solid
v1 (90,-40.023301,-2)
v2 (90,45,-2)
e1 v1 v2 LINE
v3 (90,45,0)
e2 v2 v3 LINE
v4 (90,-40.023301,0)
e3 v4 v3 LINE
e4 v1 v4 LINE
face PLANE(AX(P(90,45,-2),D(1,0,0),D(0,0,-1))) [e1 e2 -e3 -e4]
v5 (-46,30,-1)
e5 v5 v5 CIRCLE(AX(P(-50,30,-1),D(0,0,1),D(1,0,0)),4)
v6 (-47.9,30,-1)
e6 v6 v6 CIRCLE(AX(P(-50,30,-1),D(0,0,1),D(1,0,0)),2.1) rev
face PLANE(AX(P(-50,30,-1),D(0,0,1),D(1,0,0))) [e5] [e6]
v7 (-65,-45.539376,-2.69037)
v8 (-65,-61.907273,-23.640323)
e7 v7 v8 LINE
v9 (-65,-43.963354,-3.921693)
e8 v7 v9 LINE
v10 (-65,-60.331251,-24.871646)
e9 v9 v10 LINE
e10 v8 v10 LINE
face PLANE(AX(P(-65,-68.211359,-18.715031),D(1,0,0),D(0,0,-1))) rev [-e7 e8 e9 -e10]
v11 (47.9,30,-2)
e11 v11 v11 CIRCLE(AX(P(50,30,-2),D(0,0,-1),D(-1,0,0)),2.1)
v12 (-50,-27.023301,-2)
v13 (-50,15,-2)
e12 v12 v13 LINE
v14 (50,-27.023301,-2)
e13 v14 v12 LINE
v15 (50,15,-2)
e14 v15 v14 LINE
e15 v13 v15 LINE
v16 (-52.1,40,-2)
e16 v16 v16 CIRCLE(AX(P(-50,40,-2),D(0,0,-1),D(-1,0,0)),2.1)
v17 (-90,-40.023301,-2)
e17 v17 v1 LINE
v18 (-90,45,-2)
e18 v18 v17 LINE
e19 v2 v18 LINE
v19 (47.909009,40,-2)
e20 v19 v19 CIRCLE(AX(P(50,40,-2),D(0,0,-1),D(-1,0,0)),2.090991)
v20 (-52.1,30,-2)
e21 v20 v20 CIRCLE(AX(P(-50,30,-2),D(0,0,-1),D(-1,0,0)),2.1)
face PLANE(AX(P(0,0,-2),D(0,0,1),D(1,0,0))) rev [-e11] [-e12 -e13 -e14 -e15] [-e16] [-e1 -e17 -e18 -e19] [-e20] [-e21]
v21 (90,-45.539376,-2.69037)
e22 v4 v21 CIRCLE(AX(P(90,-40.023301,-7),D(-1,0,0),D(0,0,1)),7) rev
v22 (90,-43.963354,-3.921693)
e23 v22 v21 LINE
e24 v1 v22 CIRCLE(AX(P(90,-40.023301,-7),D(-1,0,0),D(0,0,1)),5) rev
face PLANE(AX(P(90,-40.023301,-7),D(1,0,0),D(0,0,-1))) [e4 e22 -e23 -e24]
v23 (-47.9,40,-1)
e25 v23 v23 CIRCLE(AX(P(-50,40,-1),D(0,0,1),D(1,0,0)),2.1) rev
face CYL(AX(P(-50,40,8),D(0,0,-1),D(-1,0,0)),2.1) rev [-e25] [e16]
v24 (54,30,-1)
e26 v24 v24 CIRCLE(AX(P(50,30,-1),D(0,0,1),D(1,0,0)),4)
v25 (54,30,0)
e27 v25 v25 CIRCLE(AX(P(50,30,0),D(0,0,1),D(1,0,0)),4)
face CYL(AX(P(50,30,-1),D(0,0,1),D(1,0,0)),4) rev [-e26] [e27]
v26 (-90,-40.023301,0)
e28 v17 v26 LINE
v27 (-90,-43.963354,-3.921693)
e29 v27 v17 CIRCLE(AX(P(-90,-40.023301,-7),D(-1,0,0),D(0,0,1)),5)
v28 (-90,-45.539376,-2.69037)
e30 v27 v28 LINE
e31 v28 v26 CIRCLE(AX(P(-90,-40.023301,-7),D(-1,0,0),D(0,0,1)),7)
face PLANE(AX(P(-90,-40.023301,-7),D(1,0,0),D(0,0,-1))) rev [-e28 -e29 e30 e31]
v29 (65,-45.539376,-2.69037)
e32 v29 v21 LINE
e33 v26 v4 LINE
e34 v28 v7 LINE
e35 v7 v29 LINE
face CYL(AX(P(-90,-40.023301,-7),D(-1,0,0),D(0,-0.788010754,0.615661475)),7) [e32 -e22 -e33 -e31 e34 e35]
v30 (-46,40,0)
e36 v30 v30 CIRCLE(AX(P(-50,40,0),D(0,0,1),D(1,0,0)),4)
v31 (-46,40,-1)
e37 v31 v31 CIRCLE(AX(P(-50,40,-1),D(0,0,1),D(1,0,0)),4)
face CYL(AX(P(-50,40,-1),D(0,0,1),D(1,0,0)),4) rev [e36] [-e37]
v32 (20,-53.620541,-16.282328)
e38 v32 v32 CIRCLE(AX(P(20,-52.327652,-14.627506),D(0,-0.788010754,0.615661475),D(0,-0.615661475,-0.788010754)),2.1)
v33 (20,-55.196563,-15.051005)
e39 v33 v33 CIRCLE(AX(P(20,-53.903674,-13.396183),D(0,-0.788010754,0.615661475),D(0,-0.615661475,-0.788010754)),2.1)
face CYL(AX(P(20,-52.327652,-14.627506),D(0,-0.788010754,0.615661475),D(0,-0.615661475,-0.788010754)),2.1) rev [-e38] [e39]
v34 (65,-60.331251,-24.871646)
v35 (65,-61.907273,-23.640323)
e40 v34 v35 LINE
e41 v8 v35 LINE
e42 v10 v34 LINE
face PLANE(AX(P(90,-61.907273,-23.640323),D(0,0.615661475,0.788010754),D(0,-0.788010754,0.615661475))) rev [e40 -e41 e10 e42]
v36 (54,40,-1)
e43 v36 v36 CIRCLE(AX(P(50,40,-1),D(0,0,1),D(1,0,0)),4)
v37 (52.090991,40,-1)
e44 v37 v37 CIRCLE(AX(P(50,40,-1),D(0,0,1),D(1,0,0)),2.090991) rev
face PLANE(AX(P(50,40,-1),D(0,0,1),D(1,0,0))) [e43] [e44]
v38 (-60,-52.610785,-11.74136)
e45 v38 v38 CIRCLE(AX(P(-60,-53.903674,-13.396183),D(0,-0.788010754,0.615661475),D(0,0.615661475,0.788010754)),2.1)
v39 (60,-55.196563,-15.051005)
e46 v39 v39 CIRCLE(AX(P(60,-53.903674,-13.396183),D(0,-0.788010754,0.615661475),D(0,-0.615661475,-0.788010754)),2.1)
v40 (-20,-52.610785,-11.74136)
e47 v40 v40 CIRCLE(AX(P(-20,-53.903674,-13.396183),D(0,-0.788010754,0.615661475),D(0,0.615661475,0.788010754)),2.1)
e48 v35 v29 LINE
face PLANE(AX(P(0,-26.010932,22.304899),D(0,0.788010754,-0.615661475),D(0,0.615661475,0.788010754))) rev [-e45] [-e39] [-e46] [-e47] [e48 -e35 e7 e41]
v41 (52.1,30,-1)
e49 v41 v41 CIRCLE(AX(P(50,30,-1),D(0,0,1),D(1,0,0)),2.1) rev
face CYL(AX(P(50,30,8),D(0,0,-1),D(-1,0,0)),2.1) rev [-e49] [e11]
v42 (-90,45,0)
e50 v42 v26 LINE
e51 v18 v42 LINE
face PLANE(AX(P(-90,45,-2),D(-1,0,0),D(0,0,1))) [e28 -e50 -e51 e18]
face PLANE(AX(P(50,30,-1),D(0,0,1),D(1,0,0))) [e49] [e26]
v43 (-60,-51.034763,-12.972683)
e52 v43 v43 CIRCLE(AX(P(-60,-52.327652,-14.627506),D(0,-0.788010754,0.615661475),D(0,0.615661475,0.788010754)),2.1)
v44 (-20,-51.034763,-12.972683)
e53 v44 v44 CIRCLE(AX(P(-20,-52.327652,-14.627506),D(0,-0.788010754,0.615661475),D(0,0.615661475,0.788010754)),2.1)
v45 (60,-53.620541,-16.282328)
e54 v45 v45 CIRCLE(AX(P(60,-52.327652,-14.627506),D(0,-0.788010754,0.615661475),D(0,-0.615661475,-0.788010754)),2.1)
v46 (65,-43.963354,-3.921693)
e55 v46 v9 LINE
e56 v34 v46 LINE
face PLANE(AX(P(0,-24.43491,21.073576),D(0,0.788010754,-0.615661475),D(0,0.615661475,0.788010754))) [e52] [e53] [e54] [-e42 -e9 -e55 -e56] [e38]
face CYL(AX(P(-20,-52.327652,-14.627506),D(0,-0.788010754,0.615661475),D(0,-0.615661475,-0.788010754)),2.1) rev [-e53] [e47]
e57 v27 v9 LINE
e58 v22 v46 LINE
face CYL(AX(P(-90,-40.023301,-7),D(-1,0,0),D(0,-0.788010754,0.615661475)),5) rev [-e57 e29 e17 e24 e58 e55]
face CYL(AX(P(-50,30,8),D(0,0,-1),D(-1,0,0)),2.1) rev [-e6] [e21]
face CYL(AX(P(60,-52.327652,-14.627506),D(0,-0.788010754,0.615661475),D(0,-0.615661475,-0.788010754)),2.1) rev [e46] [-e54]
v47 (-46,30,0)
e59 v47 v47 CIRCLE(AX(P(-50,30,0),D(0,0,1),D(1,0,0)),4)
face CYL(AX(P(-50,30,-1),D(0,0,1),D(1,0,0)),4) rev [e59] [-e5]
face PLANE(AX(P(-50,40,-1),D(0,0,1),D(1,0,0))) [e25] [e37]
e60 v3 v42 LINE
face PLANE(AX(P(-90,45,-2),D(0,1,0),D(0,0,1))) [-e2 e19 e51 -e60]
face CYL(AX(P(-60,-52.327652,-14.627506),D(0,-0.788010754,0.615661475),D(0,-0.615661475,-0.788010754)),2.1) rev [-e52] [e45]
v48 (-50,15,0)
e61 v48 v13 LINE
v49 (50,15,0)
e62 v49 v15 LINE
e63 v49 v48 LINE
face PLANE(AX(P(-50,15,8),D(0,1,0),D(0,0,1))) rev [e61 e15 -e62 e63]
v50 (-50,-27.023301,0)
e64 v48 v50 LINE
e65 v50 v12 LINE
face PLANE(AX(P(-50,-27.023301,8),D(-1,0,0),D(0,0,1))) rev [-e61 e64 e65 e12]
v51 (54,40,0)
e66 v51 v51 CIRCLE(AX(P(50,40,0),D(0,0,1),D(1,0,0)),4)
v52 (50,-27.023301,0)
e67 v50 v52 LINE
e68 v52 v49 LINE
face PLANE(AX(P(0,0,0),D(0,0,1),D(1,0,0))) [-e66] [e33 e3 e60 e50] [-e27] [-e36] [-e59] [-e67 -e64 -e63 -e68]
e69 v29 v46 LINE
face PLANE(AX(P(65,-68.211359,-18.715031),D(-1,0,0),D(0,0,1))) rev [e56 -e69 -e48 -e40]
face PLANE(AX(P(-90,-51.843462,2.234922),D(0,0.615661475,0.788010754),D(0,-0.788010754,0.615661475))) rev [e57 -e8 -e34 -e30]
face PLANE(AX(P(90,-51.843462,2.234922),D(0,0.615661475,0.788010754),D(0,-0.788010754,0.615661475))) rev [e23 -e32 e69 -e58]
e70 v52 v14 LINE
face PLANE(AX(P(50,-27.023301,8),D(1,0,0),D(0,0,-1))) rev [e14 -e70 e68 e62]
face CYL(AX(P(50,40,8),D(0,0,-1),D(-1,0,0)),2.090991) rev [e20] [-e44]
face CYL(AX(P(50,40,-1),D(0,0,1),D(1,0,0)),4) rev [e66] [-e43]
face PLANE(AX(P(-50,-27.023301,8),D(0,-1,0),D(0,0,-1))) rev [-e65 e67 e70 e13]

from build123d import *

# Parameters (mm, degrees)
SKETCH_2_W               = 180
SKETCH_2_H               = 90
SM_BASE_FLANGE_1_DEPTH   = 2
SM_START                 = -90
SM_EDGE_FLANGE_1_DEPTH   = 180
SM_EDGE_FLANGE_1_2_DEPTH = 180
SKETCH_10_W              = 100
SKETCH_10_H              = 42.023300627
CUT_EXTRUDE_1_DEPTH      = 10
SKETCH_11_R              = 2.1
CUT_EXTRUDE_2_DEPTH      = 2
SKETCH_12_W              = 25
SKETCH_12_H              = 26.58587188
CUT_EXTRUDE_3_DEPTH      = 10
SKETCH_13_R              = 2.1
SKETCH_13_R_2            = 2.090991101
CUT_EXTRUDE_4_DEPTH      = 10
SKETCH_14_R              = 4
CUT_EXTRUDE_5_DEPTH      = 1


# Read off the part's stored shape, not the designer's step: 边线-法兰1
# Sheet-metal steps are written as plain solids
with BuildPart() as part:
    # Sketch 2 → 基体-法兰1 (new body)
    with BuildSketch(Plane.XY):
        Rectangle(SKETCH_2_W, SKETCH_2_H)
    extrude(amount=-SM_BASE_FLANGE_1_DEPTH)

    # 边线-法兰1 outline → 边线-法兰1 (cut)
    with BuildSketch(Plane.YZ.offset(SM_START)):
        with BuildLine():
            Line((-45, -2), (-44.922280112, -2))
            ThreePointArc((-44.922280112, -2), (-42.669051938, -0.519259301), (-40.023300627, 0))
            Line((-40.023300627, 0), (-45, 0))
            Line((-45, 0), (-45, -2))
        make_face()
    extrude(amount=SM_EDGE_FLANGE_1_DEPTH, mode=Mode.SUBTRACT)

    # Sm Edge Flange 1 2 outline → Sm Edge Flange 1 2 (add)
    with BuildSketch(Plane.YZ.offset(SM_START)):
        with BuildLine():
            ThreePointArc((-44.922280112, -2), (-45.242255885, -2.334969881), (-45.539375902, -2.690369673))
            Line((-45.539375902, -2.690369673), (-61.907273007, -23.640322608))
            Line((-61.907273007, -23.640322608), (-60.3312515, -24.871645559))
            Line((-60.3312515, -24.871645559), (-43.963354395, -3.921692623))
            ThreePointArc((-43.963354395, -3.921692623), (-42.215156361, -2.506029769), (-40.023300627, -2))
            Line((-40.023300627, -2), (-44.922280112, -2))
        make_face()
    extrude(amount=SM_EDGE_FLANGE_1_2_DEPTH)

    # 草图10 → 切除-拉伸1 (cut)
    with BuildSketch(Plane(origin=(0, 0, -2), x_dir=(-1, 0, 0), z_dir=(0, 0, -1))):
        with Locations((0, -6.011650313)):
            Rectangle(SKETCH_10_W, SKETCH_10_H)
    extrude(amount=-CUT_EXTRUDE_1_DEPTH, mode=Mode.SUBTRACT)

    # 草图11 → 切除-拉伸2 (cut)
    with BuildSketch(Plane(origin=(0, -26.972946925, 21.073575737), x_dir=(1, 0, 0), z_dir=(0, -0.788010753606719, 0.6156614753256621))):
        with Locations(Location((60, -43.742751467, 0), (0, 0, 270))):
            Circle(SKETCH_11_R)
        with Locations(Location((20, -43.742751467, 0), (0, 0, 270))):
            Circle(SKETCH_11_R)
        with Locations(Location((-20, -43.742751467, 0), (0, 0, 90))):
            Circle(SKETCH_11_R)
        with Locations(Location((-60, -43.742751467, 0), (0, 0, 90))):
            Circle(SKETCH_11_R)
    extrude(amount=-CUT_EXTRUDE_2_DEPTH, mode=Mode.SUBTRACT)

    # 草图12 → 切除-拉伸3 (cut)
    with BuildSketch(Plane(origin=(0, -25.396925418, 19.842252786), x_dir=(1, 0, 0), z_dir=(0, 0.788010753606719, -0.6156614753256621))):
        with Locations((-77.5, 43.449815527)):
            Rectangle(SKETCH_12_W, SKETCH_12_H)
        with Locations((77.5, 43.449815527)):
            Rectangle(SKETCH_12_W, SKETCH_12_H)
    extrude(amount=-CUT_EXTRUDE_3_DEPTH, mode=Mode.SUBTRACT)

    # 草图13 → 切除-拉伸4 (cut)
    with BuildSketch(Plane(origin=(0, 0, -2), x_dir=(-1, 0, 0), z_dir=(0, 0, -1))):
        with Locations((50, 30)):
            Circle(SKETCH_13_R)
        with Locations((50, 40)):
            Circle(SKETCH_13_R)
        with Locations((-50, 30)):
            Circle(SKETCH_13_R)
        with Locations((-50, 40)):
            Circle(SKETCH_13_R_2)
    extrude(amount=-CUT_EXTRUDE_4_DEPTH, mode=Mode.SUBTRACT)

    # 草图14 → 切除-拉伸5 (cut)
    with BuildSketch(Plane.XY):
        with Locations((-50, 40)):
            Circle(SKETCH_14_R)
        with Locations((-50, 30)):
            Circle(SKETCH_14_R)
        with Locations((50, 40)):
            Circle(SKETCH_14_R)
        with Locations((50, 30)):
            Circle(SKETCH_14_R)
    extrude(amount=-CUT_EXTRUDE_5_DEPTH, mode=Mode.SUBTRACT)


solid = part.part
